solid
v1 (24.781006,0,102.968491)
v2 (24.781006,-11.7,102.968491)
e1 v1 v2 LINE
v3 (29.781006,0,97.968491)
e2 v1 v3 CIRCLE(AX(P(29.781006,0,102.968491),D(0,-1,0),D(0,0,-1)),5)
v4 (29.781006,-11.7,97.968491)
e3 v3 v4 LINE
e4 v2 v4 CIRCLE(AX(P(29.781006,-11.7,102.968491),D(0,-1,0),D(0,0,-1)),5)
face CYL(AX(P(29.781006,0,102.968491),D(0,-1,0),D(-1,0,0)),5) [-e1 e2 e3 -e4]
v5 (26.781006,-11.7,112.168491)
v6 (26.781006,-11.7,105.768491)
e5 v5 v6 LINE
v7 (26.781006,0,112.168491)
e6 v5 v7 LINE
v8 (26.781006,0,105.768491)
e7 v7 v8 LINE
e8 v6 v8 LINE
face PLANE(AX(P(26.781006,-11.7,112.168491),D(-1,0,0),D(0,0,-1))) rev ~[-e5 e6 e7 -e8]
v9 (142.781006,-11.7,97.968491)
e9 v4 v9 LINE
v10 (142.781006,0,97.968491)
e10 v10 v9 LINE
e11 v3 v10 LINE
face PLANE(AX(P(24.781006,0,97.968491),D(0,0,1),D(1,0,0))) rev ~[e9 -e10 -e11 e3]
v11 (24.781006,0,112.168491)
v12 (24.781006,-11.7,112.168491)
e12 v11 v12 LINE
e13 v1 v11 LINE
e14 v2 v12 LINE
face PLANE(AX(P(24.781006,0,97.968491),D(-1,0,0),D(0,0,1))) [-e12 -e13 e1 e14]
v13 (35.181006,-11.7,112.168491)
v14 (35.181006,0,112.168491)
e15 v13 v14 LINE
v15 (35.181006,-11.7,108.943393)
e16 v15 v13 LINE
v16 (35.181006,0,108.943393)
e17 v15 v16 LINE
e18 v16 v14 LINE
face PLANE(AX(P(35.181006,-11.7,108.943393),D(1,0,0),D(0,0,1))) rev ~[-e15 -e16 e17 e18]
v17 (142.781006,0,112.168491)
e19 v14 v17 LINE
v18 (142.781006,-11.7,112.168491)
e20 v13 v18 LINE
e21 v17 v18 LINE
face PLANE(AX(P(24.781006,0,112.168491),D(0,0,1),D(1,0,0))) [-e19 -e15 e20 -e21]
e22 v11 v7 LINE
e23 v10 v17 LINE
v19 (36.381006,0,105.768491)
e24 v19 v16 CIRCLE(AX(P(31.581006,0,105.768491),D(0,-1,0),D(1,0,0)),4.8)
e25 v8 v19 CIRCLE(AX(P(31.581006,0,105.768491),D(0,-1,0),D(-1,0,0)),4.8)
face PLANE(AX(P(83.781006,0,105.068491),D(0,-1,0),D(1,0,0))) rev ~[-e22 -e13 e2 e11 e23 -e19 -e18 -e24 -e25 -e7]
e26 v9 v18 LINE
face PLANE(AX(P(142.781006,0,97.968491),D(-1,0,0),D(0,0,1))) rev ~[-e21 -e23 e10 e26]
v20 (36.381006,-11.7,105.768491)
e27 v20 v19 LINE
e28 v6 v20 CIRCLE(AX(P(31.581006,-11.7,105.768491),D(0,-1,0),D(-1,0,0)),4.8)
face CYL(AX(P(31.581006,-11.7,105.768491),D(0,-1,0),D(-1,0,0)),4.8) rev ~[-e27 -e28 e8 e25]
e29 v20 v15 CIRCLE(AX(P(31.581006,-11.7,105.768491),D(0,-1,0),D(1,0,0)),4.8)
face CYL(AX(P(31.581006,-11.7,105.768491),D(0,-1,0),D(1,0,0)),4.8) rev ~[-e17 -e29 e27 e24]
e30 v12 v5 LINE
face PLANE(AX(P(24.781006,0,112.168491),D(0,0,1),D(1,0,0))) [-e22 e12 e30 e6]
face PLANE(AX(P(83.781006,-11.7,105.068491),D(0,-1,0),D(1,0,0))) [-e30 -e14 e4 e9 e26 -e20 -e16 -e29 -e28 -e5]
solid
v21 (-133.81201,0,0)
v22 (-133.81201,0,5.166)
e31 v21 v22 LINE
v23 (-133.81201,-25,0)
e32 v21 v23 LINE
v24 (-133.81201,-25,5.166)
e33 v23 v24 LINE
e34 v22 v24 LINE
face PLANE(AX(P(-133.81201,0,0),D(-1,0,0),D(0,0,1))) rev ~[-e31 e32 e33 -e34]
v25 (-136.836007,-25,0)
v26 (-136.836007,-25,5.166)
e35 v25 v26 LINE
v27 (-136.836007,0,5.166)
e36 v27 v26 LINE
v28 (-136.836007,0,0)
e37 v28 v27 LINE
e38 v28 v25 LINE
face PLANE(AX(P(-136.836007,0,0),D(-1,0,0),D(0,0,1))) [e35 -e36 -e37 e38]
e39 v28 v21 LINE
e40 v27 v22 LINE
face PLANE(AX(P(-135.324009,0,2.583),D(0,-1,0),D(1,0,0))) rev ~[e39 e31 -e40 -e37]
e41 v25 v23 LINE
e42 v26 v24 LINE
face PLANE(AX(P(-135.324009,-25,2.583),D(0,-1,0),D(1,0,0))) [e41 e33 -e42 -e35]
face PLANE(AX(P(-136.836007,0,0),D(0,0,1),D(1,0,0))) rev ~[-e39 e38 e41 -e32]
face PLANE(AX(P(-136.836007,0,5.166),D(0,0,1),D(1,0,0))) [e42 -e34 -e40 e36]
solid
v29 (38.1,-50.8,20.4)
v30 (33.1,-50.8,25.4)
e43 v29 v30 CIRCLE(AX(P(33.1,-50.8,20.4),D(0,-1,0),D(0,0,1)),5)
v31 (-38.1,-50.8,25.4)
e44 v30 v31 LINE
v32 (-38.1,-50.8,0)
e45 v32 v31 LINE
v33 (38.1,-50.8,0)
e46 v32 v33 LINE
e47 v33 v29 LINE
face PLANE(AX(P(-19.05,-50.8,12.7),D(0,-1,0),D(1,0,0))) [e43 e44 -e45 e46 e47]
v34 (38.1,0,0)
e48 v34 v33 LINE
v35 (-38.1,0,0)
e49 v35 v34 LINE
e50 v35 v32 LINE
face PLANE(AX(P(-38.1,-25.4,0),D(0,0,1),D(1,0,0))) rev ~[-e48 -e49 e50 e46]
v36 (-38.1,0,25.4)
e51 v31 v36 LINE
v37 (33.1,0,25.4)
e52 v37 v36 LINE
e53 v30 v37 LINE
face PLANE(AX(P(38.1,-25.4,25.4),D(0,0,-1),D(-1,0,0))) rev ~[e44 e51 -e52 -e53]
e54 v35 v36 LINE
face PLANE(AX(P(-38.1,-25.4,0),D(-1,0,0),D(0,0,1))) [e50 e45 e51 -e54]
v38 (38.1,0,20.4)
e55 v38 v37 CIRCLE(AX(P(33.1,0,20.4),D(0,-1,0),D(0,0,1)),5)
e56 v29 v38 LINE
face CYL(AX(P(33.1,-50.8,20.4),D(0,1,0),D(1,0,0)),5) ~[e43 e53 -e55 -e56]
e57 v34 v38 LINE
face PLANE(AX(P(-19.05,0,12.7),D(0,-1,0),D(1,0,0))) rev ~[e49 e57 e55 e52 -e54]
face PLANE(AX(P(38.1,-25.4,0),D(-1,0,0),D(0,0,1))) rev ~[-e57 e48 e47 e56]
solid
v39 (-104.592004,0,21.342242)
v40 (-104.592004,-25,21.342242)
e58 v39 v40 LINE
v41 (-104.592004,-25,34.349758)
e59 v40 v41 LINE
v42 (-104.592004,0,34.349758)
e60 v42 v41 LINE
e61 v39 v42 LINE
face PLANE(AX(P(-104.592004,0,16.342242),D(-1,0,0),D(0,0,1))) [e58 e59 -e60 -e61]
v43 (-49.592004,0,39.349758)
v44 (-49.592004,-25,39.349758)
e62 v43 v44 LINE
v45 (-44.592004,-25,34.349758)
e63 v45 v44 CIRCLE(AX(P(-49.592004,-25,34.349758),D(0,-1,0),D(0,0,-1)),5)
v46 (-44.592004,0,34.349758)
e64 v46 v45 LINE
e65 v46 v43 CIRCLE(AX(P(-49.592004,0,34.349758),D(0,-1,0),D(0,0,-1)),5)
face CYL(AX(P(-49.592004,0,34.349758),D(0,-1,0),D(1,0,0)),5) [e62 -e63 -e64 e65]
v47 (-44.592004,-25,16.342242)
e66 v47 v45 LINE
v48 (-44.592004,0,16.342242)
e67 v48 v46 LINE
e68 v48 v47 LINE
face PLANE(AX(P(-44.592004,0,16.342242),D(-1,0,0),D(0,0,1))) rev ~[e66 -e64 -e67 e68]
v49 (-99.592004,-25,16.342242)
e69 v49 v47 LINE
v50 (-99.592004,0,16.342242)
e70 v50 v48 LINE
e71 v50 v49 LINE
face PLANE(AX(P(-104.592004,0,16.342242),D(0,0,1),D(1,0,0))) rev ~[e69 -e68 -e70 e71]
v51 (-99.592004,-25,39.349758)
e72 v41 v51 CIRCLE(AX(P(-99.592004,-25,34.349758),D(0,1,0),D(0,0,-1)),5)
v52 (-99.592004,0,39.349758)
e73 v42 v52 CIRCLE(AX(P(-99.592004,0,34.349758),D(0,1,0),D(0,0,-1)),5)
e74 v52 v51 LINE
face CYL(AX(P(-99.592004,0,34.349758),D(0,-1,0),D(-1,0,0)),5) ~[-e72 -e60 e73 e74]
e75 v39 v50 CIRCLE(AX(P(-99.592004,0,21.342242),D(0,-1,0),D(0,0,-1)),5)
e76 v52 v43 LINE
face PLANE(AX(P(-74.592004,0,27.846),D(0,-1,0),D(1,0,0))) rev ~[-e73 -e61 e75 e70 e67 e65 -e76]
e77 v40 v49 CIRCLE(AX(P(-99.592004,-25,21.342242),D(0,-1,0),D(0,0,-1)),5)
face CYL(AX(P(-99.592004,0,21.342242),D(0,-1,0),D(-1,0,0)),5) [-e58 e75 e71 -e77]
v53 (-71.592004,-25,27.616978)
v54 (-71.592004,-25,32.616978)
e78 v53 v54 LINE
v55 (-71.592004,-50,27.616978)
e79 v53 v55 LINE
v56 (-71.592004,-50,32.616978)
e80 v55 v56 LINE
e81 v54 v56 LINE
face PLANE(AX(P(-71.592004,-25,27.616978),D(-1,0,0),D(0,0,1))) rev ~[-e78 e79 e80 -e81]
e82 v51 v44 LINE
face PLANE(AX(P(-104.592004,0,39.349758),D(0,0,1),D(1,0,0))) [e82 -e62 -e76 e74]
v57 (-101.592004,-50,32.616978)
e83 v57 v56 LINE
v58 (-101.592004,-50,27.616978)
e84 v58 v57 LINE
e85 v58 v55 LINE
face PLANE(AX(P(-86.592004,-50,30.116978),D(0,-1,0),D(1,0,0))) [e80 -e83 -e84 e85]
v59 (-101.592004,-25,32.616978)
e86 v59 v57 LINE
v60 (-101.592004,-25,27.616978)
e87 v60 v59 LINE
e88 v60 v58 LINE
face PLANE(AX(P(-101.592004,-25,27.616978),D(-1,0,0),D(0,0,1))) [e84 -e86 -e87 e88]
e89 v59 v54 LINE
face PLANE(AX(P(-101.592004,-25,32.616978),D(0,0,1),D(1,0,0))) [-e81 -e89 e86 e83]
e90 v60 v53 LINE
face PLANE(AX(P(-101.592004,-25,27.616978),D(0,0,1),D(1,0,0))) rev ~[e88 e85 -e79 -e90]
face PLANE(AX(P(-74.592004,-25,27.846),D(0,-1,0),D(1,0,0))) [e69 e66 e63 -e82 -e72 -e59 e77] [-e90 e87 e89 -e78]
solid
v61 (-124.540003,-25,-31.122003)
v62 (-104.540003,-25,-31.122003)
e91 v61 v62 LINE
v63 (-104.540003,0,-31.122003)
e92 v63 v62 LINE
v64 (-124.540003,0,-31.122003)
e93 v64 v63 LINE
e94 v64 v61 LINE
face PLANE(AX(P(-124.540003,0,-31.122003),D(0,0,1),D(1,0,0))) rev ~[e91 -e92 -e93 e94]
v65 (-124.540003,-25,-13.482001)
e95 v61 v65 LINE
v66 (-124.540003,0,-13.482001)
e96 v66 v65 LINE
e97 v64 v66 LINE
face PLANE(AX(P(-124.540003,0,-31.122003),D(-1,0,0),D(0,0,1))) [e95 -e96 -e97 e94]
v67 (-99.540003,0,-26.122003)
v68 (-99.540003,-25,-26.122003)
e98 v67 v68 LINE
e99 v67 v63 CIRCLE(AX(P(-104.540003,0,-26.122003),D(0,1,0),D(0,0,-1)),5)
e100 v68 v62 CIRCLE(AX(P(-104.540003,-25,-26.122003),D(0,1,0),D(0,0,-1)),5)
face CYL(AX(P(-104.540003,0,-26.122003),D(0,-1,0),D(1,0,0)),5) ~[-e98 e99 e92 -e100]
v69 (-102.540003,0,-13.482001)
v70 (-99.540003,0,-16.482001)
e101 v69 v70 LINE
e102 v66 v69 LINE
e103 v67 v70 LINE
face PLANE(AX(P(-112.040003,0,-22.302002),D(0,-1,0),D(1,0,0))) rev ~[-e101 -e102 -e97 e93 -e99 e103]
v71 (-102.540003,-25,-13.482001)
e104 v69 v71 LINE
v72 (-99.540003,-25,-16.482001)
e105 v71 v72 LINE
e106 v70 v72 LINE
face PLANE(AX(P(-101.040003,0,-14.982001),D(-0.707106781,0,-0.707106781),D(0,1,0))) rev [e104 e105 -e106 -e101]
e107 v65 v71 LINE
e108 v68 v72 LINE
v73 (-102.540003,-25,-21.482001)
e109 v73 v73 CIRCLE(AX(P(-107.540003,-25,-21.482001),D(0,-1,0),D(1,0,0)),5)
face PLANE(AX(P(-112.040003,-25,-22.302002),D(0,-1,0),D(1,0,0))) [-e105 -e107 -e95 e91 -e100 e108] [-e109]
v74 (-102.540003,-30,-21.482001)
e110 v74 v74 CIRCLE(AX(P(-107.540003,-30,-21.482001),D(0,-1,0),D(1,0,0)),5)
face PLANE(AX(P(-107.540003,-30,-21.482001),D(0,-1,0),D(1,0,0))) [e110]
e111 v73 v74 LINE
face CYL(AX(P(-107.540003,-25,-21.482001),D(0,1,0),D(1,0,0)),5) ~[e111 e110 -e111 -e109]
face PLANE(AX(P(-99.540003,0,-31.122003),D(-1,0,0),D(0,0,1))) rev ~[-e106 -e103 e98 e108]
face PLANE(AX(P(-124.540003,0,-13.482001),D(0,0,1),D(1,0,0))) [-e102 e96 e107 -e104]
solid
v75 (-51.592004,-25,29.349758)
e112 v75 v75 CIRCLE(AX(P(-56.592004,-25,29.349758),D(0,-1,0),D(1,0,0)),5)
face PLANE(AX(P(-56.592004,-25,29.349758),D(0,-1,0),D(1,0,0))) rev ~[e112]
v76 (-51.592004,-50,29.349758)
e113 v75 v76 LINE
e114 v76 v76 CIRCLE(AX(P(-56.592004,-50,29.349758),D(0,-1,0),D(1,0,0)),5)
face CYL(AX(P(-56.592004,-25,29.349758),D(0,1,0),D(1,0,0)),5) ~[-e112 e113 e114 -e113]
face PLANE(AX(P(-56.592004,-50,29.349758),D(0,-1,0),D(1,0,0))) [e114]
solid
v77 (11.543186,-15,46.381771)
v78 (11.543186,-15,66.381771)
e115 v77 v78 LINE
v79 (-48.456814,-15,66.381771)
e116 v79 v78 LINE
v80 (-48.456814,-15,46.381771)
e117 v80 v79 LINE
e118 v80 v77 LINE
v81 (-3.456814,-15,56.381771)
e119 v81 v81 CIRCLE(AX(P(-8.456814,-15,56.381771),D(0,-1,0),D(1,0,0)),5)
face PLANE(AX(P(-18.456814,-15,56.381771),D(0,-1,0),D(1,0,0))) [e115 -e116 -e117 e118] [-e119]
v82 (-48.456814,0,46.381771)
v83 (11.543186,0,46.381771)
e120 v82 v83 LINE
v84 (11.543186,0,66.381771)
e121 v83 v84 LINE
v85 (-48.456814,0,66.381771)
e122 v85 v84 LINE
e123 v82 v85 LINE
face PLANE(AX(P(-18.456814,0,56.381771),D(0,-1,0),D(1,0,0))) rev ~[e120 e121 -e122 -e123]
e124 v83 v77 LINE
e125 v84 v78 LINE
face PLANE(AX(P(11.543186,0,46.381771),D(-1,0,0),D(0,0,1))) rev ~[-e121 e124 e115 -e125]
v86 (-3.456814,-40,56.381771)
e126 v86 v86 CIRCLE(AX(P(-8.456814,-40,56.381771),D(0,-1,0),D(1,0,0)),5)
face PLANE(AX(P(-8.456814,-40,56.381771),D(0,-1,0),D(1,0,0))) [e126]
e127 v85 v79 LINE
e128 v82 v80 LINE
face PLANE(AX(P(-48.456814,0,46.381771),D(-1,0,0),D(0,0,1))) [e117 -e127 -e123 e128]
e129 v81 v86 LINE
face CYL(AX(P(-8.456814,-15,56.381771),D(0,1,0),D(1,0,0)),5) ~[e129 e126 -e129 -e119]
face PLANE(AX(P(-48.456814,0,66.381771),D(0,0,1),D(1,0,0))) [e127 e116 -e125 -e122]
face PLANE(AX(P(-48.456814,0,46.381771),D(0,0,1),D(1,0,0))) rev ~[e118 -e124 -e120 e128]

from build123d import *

# Parameters (mm, degrees)
F0_W      = 38.1
F0_H      = 25.4
F1_DEPTH  = 25.4
F3_DEPTH  = 25.4
F5_W      = 60
F5_H      = 20
F6_DEPTH  = 15
F7_R      = 5
F8_DEPTH  = 25
F9_W      = 60
F9_H      = 23.0075153246
F10_DEPTH = 25
F9_W_2    = 3.0239969492
F9_H_2    = 5.1660002209
F9_W_3    = 25
F9_H_3    = 17.6400020719
F11_R     = 5
F13_W     = 30
F13_H     = 5
F14_DEPTH = 25
F15_R     = 5
F16_DEPTH = 5
F17_SIZE  = 3
F18_R     = 5
F19_R     = 5
F20_DEPTH = 25
F21_R     = 5
F22_W     = 118
F22_H     = 14.2
F23_DEPTH = 11.7
F25_DEPTH = 25
F26_R     = 5


# Not quite as in the source:
# - the program builds the solid bodies; features that only make, move or delete a surface that nothing else refers to are left out


with BuildPart() as f1:
    # F0 (on Front) → F1 (new body)
    with BuildSketch(Plane.XZ):
        with Locations((-19.05, 12.7)):
            Rectangle(F0_W, F0_H)
        with Locations((19.05, 12.7)):
            Rectangle(F0_W, F0_H)
    extrude(amount=F1_DEPTH)

    # F3 (add): a face of the model
    f3_faces = [f1.faces().sort_by_distance(p)[0] for p in [
        (0, -25.4, 12.7),
    ]]
    extrude(f3_faces, amount=F3_DEPTH)

    # F21
    f21_edges = [f1.edges().sort_by_distance(p)[0] for p in [
        (38.1, -25.4, 25.4),
    ]]
    fillet(f21_edges, radius=F21_R)


with BuildPart() as f6:
    # F5 (on Front) → F6 (new body)
    with BuildSketch(Plane.XZ):
        with Locations((-18.4568141215, 56.381771341)):
            Rectangle(F5_W, F5_H)
    extrude(amount=F6_DEPTH)

    # F7 (on face) → F8 (join)
    with BuildSketch(Plane.XZ.offset(15)):
        with Locations((-8.4568141215, 56.381771341)):
            Circle(F7_R)
    extrude(amount=F8_DEPTH)


with BuildPart() as f10:
    # F9 (on Front) → F10 (new body)
    with BuildSketch(Plane.XZ):
        with Locations((-74.5920035988, 27.8460001573)):
            Rectangle(F9_W, F9_H)
    extrude(amount=F10_DEPTH)

    # F11
    f11_edges = [f10.edges().sort_by_distance(p)[0] for p in [
        (-104.592004, -12.5, 39.349758),
        (-104.592004, -12.5, 16.342242),
        (-44.592004, -12.5, 39.349758),
    ]]
    fillet(f11_edges, radius=F11_R)

    # F13 (on face) → F14 (join)
    with BuildSketch(Plane.XZ.offset(25)):
        with Locations((-86.5920035988, 30.1169776731)):
            Rectangle(F13_W, F13_H)
    extrude(amount=F14_DEPTH)


with BuildPart() as f10b:
    # F9 (on Front) → F10, piece 2 (new body)
    with BuildSketch(Plane.XZ):
        with Locations((-135.3240087628, 2.5830001105)):
            Rectangle(F9_W_2, F9_H_2)
    extrude(amount=F10_DEPTH)


with BuildPart() as f10c:
    # F9 (on Front) → F10, piece 3 (new body)
    with BuildSketch(Plane.XZ):
        with Locations((-112.0400026441, -22.3020017147)):
            Rectangle(F9_W_3, F9_H_3)
    extrude(amount=F10_DEPTH)

    # F15 (on face) → F16 (join)
    with BuildSketch(Plane.XZ.offset(25)):
        with Locations((-107.5400026441, -21.4820006788)):
            Circle(F15_R)
    extrude(amount=F16_DEPTH)

    # F17
    f17_edges = [f10c.edges().sort_by_distance(p)[0] for p in [
        (-99.540003, -12.5, -13.482001),
    ]]
    chamfer(f17_edges, length=F17_SIZE)

    # F18
    f18_edges = [f10c.edges().sort_by_distance(p)[0] for p in [
        (-99.540003, -12.5, -31.122003),
    ]]
    fillet(f18_edges, radius=F18_R)


with BuildPart() as f20:
    # F19 (on face) → F20 (new body)
    with BuildSketch(Plane.XZ.offset(25)):
        with Locations((-56.5920035988, 29.3497578196)):
            Circle(F19_R)
    extrude(amount=F20_DEPTH)


with BuildPart() as f23:
    # F22 (on Front) → F23 (new body)
    with BuildSketch(Plane.XZ):
        with Locations((83.7810058147, 105.068490946)):
            Rectangle(F22_W, F22_H)
    extrude(amount=F23_DEPTH)

    # F24 (on face) → F25 (cut)
    with BuildSketch(Plane.XZ.offset(11.7)):
        with BuildLine():
            ThreePointArc((26.7810058147, 105.768490946), (31.5810058147, 100.968490946), (36.3810058147, 105.768490946))
            ThreePointArc((36.3810058147, 105.768490946), (36.0709946788, 107.4655472209), (35.1810058147, 108.9433925193))
            ThreePointArc((35.1810058147, 108.9433925193), (29.8839495398, 110.2584798102), (26.7810058147, 105.768490946))
        make_face()
        with BuildLine():
            ThreePointArc((26.7810058147, 105.768490946), (29.8839495398, 110.2584798102), (35.1810058147, 108.9433925193))
            Line((35.1810058147, 108.9433925193), (35.1810058147, 112.168490946))
            Line((35.1810058147, 112.168490946), (26.7810058147, 112.168490946))
            Line((26.7810058147, 112.168490946), (26.7810058147, 105.768490946))
        make_face()
    extrude(amount=-F25_DEPTH, mode=Mode.SUBTRACT)

    # F26
    f26_edges = [f23.edges().sort_by_distance(p)[0] for p in [
        (24.781006, -5.85, 97.968491),
    ]]
    fillet(f26_edges, radius=F26_R)


solid = Compound([f1.part, f6.part, f10.part, f10b.part, f10c.part, f20.part, f23.part])
